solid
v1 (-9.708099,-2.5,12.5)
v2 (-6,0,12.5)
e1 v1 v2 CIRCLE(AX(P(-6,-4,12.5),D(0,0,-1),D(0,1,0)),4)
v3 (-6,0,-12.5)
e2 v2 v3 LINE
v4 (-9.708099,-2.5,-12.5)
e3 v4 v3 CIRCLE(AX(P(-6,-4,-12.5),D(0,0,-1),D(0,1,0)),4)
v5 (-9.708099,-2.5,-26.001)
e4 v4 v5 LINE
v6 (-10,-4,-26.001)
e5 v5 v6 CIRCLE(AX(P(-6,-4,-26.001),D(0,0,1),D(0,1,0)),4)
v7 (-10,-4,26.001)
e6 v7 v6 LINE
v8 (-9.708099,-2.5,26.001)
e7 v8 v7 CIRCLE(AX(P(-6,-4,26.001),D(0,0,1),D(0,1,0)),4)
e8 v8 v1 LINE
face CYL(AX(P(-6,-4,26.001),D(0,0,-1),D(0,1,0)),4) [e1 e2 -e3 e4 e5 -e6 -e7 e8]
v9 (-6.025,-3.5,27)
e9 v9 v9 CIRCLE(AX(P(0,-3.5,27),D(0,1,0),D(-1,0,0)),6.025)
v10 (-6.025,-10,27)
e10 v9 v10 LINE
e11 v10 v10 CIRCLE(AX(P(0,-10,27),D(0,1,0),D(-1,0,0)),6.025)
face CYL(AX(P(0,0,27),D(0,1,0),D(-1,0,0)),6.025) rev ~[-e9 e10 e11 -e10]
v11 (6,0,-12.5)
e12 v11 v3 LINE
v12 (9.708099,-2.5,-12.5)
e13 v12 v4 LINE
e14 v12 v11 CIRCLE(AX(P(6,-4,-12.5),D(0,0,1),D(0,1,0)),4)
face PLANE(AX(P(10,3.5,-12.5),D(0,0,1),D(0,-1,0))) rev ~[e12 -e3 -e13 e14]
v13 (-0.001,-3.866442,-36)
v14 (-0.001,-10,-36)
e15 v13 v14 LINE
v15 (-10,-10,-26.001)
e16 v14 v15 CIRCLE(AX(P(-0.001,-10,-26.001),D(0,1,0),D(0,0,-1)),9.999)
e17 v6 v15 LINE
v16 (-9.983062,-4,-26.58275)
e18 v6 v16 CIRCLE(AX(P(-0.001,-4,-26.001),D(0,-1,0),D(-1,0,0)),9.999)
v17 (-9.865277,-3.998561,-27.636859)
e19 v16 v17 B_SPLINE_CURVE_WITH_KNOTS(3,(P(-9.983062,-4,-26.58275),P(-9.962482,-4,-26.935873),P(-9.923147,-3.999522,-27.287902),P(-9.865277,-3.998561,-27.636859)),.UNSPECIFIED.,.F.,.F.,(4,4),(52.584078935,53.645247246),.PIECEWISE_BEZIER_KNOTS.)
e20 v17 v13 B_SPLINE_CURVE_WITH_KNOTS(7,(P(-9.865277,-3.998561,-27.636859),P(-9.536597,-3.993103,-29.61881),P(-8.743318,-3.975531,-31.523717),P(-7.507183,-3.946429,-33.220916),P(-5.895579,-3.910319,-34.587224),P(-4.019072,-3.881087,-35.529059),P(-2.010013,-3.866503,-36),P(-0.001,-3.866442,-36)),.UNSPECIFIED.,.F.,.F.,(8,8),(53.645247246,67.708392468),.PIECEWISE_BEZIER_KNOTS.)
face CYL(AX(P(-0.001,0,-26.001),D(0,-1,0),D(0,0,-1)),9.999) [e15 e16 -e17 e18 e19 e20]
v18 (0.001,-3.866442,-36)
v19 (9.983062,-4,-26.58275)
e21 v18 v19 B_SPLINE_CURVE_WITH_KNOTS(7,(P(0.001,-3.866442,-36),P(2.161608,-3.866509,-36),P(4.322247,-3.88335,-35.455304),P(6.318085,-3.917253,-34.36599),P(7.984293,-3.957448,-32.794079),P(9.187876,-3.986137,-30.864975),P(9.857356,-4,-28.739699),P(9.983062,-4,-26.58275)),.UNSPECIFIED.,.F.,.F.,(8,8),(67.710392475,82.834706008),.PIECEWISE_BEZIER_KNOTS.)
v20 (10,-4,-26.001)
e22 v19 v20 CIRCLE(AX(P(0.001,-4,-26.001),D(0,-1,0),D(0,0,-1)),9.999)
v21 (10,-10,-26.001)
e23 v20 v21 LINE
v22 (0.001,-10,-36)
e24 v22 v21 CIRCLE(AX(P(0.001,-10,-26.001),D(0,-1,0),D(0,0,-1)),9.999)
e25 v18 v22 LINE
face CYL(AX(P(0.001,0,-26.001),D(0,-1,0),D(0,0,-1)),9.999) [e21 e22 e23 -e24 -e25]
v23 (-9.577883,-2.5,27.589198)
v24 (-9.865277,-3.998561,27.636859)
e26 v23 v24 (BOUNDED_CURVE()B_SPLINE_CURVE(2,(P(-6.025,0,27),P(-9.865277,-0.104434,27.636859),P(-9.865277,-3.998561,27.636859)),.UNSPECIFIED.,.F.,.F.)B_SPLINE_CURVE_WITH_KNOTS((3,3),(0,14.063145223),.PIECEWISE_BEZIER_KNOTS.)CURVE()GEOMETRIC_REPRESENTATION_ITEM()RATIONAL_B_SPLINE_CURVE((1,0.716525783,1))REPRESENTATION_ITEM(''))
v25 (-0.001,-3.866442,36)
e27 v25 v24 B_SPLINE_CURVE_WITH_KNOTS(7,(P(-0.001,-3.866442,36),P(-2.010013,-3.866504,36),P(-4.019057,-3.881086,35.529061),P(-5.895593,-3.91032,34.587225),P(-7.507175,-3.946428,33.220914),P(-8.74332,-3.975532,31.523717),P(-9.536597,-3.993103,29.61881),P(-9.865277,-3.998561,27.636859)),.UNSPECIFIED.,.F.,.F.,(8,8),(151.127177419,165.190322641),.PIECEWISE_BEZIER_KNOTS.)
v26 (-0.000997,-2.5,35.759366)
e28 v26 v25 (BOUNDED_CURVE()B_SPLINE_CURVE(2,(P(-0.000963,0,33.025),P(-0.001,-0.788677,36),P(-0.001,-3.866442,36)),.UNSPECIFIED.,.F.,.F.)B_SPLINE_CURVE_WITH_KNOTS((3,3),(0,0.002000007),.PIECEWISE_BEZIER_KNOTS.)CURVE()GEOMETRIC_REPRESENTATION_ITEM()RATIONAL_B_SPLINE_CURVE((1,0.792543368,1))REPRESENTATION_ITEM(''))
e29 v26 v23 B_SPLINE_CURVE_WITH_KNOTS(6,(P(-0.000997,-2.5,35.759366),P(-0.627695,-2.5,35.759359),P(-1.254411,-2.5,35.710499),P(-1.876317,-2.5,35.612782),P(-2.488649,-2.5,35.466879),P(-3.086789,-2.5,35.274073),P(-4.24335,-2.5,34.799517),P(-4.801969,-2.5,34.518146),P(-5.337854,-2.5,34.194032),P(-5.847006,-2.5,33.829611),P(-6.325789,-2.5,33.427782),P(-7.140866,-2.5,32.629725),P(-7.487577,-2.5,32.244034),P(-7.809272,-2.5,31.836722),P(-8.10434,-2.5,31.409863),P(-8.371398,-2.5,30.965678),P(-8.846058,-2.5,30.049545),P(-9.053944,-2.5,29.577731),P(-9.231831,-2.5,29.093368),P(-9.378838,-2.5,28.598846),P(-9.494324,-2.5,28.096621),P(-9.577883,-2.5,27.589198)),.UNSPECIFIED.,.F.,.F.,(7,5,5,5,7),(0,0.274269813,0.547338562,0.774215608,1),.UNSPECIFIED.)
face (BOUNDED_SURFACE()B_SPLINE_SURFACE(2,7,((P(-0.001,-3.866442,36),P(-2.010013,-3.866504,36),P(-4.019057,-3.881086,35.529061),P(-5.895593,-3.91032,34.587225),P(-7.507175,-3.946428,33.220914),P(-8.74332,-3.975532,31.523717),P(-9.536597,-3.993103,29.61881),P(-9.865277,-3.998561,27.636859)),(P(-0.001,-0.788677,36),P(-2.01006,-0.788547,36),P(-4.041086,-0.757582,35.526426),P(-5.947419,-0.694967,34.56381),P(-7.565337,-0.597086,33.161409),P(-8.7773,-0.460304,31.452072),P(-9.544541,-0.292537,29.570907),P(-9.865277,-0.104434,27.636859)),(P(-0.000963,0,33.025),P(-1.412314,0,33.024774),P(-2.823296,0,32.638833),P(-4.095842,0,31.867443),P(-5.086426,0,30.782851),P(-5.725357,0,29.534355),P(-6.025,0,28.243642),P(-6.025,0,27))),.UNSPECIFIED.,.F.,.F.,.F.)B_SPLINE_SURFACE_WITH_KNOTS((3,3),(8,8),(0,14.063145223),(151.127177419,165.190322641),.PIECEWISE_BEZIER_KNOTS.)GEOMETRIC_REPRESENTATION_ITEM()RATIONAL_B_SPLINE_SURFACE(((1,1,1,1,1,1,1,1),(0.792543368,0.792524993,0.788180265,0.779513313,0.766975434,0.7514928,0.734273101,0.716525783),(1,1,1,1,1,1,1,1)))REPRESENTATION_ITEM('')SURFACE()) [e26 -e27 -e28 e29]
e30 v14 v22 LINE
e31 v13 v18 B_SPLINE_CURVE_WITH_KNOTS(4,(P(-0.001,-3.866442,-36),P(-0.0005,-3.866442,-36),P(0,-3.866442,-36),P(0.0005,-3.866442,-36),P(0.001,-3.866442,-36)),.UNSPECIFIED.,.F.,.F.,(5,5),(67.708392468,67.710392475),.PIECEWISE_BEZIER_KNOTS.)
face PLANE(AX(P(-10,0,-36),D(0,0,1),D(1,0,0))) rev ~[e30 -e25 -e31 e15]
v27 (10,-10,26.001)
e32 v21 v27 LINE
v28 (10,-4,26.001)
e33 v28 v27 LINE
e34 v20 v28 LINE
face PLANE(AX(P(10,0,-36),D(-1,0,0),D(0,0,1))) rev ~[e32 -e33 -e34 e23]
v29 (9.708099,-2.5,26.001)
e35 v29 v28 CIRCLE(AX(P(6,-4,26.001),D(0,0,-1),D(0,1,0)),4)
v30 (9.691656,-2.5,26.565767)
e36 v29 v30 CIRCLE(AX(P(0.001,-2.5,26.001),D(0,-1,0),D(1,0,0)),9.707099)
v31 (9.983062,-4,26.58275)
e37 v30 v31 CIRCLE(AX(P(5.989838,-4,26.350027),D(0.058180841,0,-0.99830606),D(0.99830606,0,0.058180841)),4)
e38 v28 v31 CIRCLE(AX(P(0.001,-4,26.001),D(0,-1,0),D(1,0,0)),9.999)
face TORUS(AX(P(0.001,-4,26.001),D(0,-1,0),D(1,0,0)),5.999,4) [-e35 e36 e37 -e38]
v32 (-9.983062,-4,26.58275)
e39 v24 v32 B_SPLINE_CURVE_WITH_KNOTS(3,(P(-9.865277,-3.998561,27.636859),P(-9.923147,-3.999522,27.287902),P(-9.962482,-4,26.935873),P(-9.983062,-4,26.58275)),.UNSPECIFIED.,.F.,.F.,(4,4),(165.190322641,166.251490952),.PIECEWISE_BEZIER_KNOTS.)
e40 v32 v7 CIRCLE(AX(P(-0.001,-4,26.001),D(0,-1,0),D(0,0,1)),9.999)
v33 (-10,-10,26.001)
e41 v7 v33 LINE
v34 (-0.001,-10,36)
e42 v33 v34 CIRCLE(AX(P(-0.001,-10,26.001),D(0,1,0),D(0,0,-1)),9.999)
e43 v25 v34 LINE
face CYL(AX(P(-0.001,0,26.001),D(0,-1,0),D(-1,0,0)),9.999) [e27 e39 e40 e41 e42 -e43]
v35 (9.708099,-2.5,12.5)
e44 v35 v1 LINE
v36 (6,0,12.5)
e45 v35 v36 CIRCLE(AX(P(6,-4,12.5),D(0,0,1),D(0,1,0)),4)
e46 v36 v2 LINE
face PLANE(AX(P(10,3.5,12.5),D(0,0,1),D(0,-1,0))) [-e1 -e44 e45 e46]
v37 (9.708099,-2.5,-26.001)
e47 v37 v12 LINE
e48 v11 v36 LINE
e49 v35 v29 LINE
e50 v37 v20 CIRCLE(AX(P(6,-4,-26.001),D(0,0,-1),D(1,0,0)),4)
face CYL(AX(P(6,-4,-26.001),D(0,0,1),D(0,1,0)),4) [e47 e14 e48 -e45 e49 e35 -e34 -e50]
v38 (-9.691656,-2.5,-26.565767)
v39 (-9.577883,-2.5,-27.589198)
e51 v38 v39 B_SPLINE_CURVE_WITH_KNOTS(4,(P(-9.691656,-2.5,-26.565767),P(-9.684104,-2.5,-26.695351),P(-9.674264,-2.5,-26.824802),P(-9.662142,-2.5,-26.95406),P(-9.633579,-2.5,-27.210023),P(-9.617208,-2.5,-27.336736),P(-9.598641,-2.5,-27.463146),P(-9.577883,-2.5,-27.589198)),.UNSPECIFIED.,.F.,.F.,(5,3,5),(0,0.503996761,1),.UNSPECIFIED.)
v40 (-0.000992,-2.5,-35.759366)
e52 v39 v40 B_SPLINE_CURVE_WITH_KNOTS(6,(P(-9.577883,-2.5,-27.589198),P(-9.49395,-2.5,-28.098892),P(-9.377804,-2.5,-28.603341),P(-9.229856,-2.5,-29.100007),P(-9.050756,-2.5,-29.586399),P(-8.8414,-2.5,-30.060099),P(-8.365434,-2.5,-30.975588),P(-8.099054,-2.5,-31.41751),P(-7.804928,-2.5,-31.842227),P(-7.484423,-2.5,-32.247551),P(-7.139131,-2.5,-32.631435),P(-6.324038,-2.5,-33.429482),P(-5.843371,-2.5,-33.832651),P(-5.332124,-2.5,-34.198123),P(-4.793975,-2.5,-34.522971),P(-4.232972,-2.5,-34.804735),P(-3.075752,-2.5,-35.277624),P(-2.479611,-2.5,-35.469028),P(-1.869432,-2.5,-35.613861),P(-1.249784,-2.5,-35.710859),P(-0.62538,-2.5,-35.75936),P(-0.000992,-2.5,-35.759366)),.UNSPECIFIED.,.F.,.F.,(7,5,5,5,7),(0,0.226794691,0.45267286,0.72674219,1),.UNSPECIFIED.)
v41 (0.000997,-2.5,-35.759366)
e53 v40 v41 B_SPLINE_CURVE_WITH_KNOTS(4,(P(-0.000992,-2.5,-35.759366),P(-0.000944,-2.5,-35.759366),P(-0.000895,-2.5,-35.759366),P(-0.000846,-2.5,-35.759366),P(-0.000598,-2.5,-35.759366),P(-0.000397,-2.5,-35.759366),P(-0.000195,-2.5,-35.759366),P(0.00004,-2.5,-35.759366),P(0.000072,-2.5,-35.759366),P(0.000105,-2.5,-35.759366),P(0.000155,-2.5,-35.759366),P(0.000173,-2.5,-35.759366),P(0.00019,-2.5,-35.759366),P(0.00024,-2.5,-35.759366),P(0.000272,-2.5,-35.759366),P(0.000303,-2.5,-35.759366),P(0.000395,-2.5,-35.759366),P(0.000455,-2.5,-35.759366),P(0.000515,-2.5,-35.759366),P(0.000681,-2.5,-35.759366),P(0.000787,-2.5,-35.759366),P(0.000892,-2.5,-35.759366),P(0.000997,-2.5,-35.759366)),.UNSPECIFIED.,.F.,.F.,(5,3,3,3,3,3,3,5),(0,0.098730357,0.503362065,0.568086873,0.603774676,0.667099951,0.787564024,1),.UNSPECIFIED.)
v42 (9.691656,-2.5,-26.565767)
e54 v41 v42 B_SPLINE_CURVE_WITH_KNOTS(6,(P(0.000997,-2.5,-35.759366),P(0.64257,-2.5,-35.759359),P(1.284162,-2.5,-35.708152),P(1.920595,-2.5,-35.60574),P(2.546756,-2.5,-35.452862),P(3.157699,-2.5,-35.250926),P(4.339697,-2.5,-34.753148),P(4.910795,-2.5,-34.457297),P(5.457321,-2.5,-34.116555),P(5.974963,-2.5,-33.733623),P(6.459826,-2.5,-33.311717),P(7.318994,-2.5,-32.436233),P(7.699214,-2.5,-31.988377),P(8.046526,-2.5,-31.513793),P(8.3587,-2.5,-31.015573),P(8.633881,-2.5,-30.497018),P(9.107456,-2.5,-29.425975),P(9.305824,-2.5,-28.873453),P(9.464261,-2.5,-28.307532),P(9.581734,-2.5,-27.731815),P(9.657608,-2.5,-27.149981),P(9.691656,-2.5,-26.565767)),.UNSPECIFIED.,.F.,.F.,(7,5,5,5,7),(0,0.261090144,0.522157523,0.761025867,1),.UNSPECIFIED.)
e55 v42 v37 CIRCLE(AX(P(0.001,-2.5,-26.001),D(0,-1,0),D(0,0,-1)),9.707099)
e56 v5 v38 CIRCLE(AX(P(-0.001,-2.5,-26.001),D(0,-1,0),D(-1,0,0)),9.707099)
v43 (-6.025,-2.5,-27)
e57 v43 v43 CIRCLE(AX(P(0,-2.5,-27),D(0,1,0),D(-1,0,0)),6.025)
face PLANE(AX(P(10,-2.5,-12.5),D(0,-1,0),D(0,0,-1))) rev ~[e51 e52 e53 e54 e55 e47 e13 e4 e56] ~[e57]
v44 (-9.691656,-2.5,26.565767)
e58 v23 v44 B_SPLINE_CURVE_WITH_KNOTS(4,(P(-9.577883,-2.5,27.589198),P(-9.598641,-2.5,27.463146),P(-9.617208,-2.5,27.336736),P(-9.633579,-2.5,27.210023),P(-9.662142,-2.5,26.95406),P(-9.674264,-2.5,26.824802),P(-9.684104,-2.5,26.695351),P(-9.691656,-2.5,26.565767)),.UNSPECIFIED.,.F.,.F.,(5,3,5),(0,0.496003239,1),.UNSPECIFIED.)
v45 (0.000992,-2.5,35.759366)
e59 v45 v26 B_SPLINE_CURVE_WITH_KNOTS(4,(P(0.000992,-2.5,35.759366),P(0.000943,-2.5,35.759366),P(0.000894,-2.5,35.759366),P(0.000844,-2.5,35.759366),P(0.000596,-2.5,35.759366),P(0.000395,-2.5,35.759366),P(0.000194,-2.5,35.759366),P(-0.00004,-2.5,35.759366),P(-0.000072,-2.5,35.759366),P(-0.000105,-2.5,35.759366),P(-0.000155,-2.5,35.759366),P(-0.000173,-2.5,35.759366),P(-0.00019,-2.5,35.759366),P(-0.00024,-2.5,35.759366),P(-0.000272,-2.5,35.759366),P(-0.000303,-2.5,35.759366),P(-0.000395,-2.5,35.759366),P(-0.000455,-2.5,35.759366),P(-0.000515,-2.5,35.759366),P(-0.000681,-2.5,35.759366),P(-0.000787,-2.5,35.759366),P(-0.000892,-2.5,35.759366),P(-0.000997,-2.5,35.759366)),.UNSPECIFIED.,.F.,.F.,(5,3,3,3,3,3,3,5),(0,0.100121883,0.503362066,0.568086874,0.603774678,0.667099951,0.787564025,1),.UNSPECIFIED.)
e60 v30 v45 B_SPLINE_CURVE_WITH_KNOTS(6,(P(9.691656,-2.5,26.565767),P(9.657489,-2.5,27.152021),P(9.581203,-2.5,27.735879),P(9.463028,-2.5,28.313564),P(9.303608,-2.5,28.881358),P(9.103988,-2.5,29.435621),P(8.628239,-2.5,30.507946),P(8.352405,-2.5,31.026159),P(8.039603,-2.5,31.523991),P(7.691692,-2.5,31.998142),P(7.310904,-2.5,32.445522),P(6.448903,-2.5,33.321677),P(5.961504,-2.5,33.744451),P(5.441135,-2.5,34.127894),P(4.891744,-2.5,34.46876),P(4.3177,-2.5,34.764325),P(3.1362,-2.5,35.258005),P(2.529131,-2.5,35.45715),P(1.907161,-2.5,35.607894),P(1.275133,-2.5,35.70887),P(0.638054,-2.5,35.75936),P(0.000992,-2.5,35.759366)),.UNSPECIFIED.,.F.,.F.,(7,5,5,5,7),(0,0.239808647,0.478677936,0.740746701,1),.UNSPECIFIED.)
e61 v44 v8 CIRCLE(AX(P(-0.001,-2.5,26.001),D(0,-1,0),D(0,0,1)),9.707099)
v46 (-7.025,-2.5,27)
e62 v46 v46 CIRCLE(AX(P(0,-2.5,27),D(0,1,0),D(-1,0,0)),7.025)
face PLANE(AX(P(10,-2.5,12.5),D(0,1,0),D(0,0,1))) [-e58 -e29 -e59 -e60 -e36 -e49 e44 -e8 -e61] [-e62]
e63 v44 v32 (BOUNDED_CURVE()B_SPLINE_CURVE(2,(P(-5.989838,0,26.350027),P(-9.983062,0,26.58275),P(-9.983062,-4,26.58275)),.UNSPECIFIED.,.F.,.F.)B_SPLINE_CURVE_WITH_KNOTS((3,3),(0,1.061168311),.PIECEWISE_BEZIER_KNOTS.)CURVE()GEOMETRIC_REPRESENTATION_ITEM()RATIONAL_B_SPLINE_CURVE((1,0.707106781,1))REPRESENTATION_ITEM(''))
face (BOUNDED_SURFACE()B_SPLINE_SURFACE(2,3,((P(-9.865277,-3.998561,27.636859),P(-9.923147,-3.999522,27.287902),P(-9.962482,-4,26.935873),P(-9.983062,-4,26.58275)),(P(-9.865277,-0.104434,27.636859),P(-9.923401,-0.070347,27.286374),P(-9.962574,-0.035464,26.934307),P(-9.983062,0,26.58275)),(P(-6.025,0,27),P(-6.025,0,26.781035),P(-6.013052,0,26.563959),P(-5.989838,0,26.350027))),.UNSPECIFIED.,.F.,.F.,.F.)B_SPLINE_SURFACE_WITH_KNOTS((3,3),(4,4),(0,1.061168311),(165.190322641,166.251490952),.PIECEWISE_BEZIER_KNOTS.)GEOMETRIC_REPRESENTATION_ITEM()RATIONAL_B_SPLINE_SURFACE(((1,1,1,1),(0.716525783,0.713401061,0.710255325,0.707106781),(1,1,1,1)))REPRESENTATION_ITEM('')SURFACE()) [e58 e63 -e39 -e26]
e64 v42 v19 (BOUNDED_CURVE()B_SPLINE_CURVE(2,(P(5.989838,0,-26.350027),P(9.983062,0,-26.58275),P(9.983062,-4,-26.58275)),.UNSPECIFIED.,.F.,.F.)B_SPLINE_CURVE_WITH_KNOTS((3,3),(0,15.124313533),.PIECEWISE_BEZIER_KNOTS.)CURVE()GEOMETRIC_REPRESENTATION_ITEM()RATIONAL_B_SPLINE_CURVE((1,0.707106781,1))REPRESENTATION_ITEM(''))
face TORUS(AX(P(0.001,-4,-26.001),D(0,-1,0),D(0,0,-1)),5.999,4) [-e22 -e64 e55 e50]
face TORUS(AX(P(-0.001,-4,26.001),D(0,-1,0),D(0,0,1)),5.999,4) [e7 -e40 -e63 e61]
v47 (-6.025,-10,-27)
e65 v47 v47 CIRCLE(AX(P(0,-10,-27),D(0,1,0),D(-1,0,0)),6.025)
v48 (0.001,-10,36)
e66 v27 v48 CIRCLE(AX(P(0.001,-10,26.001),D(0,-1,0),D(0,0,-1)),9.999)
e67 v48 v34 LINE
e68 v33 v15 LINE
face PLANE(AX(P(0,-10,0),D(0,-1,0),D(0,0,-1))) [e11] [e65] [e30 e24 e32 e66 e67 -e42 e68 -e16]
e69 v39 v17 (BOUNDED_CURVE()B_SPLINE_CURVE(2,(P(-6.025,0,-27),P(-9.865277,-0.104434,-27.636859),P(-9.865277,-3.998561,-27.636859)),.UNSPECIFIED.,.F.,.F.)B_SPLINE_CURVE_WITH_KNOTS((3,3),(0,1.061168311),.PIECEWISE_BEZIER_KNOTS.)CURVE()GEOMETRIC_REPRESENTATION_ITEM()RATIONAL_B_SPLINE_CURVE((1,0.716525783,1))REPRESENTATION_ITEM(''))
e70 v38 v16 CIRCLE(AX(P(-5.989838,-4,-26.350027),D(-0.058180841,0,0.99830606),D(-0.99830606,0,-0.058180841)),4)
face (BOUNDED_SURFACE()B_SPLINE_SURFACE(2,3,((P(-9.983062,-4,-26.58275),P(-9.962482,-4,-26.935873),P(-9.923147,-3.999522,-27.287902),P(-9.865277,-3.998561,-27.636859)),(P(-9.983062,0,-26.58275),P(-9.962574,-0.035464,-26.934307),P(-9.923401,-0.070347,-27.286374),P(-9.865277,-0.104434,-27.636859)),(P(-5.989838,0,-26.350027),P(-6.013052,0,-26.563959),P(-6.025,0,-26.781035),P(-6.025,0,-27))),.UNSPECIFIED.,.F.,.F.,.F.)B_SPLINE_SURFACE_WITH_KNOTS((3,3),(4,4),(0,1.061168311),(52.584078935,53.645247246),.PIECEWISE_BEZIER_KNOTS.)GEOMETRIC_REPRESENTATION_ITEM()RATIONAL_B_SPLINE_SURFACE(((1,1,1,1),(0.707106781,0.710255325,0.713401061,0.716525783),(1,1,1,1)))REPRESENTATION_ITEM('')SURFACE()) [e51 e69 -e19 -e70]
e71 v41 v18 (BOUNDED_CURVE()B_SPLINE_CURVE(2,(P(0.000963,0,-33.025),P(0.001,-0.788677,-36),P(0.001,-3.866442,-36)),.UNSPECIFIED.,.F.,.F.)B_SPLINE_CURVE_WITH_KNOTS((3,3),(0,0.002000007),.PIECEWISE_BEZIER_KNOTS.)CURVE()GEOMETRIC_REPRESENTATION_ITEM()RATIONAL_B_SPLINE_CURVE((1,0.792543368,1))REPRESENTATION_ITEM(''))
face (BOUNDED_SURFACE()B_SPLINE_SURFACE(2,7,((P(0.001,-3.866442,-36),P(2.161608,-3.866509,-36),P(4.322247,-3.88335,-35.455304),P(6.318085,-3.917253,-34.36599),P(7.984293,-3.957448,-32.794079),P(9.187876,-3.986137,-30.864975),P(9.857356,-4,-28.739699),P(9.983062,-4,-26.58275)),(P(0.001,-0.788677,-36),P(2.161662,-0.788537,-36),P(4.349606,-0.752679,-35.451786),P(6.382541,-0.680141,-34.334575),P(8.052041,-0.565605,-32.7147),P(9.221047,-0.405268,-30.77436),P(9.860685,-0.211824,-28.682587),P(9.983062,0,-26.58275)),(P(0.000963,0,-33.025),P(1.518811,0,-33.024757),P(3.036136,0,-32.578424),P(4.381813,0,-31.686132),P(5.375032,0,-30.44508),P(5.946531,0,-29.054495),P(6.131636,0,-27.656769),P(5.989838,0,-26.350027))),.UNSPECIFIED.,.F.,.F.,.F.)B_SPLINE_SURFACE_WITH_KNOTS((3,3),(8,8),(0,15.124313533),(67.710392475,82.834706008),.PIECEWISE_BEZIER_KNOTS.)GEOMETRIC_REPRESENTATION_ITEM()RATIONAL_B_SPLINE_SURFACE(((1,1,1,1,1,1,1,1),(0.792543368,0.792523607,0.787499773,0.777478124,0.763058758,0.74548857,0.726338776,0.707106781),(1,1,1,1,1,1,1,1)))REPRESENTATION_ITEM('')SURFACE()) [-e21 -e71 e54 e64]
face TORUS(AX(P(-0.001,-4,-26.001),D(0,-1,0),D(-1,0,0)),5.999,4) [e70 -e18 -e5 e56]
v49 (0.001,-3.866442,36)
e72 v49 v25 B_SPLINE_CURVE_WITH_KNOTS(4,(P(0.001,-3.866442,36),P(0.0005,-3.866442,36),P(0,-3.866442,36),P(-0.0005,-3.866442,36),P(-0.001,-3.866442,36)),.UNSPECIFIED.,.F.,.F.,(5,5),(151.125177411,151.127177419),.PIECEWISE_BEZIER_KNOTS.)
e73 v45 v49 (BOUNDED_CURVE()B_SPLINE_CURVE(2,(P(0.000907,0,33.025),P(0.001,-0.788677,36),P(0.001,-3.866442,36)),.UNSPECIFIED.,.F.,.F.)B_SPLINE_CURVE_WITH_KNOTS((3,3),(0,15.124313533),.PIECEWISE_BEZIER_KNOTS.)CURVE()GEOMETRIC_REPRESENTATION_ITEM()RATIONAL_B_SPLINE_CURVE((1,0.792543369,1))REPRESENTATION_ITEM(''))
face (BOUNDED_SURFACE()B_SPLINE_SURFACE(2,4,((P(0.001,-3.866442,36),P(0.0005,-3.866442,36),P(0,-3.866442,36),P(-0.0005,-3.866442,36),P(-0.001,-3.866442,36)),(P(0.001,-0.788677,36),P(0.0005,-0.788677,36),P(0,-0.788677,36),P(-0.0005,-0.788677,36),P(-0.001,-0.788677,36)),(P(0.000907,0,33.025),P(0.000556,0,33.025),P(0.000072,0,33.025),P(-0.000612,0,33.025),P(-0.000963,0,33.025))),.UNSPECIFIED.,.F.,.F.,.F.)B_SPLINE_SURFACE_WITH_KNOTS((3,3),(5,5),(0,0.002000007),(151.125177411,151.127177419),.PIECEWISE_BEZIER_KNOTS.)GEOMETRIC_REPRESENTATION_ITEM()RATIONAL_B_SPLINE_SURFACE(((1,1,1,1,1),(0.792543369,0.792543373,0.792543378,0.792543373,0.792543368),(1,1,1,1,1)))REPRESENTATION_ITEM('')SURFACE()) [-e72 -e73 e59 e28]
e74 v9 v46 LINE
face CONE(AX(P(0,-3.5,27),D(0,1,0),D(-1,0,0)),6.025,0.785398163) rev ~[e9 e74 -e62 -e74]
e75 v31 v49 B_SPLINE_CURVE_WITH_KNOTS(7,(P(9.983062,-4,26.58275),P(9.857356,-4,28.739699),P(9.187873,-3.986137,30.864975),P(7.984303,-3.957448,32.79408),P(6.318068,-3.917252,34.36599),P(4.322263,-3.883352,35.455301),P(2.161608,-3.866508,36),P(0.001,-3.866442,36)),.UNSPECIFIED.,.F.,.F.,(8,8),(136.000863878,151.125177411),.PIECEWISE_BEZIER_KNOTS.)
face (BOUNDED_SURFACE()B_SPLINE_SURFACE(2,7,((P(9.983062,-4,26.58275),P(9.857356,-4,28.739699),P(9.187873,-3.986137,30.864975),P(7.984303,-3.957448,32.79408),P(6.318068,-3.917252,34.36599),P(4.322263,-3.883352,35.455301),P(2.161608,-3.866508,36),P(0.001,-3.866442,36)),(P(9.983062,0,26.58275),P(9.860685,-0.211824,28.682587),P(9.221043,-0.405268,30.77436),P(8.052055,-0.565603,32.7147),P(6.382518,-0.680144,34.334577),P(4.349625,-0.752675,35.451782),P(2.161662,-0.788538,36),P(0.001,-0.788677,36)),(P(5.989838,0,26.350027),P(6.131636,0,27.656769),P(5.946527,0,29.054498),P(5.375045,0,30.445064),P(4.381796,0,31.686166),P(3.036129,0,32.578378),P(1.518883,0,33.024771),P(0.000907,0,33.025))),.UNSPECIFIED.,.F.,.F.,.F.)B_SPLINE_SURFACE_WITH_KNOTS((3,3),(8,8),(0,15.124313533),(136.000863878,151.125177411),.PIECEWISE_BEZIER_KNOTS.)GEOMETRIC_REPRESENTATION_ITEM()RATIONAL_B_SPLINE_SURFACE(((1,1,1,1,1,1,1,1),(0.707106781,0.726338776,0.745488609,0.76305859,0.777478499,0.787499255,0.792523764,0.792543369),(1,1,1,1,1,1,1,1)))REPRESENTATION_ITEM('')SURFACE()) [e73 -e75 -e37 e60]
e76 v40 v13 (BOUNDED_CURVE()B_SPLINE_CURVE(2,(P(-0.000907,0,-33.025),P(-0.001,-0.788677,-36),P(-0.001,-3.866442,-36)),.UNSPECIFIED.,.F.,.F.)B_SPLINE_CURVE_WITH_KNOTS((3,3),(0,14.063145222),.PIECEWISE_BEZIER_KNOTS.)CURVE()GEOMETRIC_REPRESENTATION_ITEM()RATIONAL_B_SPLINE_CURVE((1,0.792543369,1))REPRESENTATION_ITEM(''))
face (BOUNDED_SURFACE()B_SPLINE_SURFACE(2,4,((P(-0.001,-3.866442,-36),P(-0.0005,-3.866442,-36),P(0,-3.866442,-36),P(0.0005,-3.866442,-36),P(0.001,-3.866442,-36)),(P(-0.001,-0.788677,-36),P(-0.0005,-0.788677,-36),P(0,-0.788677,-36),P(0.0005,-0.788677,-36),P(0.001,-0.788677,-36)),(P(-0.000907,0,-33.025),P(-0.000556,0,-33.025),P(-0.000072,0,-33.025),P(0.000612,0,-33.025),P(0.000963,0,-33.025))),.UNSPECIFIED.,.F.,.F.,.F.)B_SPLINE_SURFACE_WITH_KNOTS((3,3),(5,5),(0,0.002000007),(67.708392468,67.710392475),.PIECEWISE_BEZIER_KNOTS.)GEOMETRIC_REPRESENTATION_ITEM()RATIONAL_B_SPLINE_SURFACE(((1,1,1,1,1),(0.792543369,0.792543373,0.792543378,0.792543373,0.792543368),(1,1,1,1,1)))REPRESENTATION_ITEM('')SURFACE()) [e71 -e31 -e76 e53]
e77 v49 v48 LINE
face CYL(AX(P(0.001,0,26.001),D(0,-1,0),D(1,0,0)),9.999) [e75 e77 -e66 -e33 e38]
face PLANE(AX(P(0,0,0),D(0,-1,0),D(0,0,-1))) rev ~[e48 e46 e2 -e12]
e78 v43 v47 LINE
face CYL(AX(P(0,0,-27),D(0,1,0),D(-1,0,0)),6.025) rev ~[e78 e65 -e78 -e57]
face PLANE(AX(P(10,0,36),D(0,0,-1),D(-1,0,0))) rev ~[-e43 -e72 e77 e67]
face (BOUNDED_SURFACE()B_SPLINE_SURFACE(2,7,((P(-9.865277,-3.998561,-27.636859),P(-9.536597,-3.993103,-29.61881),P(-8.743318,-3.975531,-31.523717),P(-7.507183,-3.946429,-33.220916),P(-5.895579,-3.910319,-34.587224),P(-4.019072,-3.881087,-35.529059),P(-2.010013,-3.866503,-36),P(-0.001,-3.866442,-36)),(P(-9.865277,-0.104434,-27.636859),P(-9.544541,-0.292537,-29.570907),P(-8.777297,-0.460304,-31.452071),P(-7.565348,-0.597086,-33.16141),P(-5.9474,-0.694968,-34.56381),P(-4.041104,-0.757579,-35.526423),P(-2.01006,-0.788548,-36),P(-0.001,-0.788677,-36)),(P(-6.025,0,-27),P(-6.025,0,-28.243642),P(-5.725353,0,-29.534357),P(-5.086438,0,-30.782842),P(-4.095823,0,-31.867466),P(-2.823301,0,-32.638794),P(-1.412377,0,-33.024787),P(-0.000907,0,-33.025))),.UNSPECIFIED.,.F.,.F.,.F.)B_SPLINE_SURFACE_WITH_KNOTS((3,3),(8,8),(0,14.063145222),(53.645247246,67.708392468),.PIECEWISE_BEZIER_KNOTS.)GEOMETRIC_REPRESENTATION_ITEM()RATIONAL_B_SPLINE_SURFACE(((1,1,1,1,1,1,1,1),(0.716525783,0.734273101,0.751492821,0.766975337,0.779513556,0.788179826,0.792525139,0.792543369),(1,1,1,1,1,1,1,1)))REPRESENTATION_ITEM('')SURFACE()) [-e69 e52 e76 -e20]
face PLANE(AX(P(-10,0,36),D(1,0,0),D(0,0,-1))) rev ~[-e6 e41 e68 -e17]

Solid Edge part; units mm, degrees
sketch "Sketch1" plane through (0, 0, 0) normal (0, -1, 0) x (1, 0, 0)
  line L0 (-10, -36) -> (10, -36)
  line L1 (10, -36) -> (10, 36)
  line L2 (10, 36) -> (-10, 36)
  line L3 (-10, 36) -> (-10, -36)
  dimension "D1" = 72
  dimension "D2" = 20
extrude "Protrusion1" add sketch "Sketch1" along normal blind 10
sketch "Sketch2" plane through (0, 0, 0) normal (0, 1, 0) x (-1, 0, 0)
  circle A0 centre (0, 27) radius 6.025
  circle A1 centre (0, -27) radius 6.025
  dimension "D1" = 12.05
  dimension "D2" = 54
extrude "Cutout1" cut sketch "Sketch2" against normal through all
fillet "Verrundung_1" radius 10 4 edges at (-10, -5, 36) (10, -5, 36) (-10, -5, -36) (10, -5, -36)
fillet "Verrundung_2" radius 4 3 edges at (-10, 0, 0) (10, 0, 0) (0, 0, 36)
sketch "Sketch3" plane through (10, -7, 0) normal (1, 0, 0) x (0, 0, -1)
  line L0 (-12.5, 4.5) -> (-37.5, 4.5)
  line L1 (-37.5, 4.5) -> (-37.5, 10.5)
  line L2 (-37.5, 10.5) -> (-12.5, 10.5)
  line L3 (-12.5, 10.5) -> (-12.5, 4.5)
  line L4 (12.5, 4.5) -> (37.5, 4.5)
  line L5 (37.5, 4.5) -> (37.5, 10.5)
  line L6 (37.5, 10.5) -> (12.5, 10.5)
  line L7 (12.5, 10.5) -> (12.5, 4.5)
  dimension "D1" = 7.5
  dimension "D2" = 7.5
  dimension "D3" = 25
  dimension "D4" = 6
  dimension "D5" = 10.5
  dimension "D6" = 25
  dimension "D7" = 25
extrude "Cutout2" cut sketch "Sketch3" against normal through all
chamfer "Fase_1" distance 1 angle 45 1 edges at (0, -2.5, 20.975)
